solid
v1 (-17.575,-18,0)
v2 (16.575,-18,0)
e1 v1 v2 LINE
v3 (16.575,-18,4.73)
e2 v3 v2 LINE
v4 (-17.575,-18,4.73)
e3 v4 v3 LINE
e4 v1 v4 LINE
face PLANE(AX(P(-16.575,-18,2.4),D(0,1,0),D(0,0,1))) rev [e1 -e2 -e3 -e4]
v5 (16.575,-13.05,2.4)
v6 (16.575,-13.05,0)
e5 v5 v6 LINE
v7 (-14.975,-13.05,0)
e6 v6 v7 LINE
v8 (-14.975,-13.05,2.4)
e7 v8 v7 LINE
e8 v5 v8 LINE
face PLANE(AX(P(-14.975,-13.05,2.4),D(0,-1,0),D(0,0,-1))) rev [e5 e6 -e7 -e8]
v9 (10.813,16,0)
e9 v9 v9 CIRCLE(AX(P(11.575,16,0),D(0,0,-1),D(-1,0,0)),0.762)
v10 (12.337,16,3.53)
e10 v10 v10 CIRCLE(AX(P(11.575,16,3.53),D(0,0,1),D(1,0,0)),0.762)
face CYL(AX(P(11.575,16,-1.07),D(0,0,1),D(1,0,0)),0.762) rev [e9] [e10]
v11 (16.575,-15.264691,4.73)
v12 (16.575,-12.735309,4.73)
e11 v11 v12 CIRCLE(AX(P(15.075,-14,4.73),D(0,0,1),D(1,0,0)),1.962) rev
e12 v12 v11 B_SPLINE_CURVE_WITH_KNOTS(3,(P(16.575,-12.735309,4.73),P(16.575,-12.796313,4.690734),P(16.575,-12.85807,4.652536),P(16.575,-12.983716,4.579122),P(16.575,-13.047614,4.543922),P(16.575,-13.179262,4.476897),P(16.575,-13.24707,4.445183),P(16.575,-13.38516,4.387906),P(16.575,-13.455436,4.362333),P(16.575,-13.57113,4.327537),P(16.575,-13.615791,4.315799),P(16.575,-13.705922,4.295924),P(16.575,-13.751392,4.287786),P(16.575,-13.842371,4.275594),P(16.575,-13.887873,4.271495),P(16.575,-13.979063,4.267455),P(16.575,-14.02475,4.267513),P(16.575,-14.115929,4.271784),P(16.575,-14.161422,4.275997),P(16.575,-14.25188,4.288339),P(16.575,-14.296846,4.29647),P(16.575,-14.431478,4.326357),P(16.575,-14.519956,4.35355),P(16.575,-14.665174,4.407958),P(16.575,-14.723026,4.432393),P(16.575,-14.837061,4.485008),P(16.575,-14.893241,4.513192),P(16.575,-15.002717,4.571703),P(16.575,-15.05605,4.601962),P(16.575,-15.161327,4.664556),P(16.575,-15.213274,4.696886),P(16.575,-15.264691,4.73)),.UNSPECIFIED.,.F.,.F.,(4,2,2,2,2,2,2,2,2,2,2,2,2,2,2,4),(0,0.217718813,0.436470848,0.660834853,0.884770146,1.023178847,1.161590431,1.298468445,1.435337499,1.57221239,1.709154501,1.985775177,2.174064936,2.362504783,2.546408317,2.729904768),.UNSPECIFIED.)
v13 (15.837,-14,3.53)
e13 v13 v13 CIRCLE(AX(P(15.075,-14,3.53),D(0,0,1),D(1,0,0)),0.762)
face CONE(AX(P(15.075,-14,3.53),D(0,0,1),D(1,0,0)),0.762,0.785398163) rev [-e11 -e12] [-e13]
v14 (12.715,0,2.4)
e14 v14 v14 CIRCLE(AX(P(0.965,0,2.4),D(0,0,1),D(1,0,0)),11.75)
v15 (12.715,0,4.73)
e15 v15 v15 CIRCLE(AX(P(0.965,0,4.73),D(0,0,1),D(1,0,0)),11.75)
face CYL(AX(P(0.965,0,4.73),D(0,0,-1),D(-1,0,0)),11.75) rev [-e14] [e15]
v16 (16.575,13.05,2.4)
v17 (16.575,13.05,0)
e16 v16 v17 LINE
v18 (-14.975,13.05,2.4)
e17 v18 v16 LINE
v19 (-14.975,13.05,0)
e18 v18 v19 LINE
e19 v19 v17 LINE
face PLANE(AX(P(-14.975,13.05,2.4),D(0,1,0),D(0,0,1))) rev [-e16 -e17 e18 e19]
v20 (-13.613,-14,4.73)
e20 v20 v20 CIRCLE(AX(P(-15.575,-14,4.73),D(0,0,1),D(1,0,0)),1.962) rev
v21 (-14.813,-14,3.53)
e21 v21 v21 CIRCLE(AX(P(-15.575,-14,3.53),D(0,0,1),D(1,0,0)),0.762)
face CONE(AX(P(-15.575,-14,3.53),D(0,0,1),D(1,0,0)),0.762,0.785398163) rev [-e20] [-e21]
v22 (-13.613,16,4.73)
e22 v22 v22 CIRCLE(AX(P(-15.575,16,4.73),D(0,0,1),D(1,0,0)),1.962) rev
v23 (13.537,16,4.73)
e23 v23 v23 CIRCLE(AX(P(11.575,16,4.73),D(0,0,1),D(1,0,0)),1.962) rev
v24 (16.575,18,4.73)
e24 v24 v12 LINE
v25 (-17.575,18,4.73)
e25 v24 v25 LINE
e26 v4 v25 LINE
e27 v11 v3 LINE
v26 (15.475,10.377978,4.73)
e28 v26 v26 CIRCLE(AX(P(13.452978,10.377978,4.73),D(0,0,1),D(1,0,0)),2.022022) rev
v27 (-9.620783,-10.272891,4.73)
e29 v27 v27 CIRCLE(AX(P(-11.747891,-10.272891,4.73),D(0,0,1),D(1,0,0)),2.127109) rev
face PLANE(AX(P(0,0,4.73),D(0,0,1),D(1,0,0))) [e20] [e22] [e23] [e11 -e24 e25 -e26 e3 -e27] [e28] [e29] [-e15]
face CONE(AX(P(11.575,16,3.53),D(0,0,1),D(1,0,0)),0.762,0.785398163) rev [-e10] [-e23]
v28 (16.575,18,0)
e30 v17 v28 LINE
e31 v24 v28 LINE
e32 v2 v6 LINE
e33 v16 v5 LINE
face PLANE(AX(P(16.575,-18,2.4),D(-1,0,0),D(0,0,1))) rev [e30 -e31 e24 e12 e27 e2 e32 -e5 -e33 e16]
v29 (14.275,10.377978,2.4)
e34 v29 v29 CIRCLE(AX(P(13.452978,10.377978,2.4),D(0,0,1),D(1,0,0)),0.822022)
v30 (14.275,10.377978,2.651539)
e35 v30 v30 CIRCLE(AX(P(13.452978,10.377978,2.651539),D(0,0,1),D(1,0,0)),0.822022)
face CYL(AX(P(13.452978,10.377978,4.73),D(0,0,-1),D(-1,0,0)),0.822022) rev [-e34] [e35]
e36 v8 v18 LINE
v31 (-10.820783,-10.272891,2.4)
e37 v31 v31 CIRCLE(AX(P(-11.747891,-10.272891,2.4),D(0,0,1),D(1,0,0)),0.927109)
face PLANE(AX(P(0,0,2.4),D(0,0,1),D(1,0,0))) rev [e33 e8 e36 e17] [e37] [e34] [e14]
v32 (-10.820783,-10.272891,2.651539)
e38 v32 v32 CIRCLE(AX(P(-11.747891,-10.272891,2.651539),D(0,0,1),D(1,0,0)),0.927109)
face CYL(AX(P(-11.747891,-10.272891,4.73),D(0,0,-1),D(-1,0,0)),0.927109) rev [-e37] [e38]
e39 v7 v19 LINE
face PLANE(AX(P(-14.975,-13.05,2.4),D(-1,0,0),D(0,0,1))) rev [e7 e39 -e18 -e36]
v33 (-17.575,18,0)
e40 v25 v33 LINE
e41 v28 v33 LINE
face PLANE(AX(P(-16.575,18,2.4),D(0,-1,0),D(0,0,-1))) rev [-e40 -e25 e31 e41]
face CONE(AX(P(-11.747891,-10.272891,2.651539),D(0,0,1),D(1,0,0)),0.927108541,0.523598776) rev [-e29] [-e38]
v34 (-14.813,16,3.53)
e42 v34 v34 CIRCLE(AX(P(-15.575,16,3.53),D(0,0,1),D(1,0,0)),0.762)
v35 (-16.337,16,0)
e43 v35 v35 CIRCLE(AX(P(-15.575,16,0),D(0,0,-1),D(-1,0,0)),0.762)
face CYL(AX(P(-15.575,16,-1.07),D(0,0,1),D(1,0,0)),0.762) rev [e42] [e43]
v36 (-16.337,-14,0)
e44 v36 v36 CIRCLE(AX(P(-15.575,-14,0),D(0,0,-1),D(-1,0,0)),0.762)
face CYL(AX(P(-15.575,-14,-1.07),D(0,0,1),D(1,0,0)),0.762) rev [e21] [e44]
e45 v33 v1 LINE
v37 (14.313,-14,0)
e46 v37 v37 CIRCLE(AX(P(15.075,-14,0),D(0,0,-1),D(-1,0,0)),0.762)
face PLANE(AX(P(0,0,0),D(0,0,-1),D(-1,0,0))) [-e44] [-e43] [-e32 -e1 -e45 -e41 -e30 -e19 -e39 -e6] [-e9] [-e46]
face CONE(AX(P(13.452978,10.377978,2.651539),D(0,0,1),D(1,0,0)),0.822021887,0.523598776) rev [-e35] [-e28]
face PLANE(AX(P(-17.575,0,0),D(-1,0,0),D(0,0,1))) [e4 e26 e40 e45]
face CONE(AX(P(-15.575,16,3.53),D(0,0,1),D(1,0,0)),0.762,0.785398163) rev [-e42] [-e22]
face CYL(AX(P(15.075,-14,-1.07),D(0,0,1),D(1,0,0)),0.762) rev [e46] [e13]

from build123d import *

# Parameters (mm, degrees)
BOSS_EXTRUDE1_DEPTH = 2.4
SKETCH2_W           = 33.15
SKETCH2_H           = 36
SKETCH2_R           = 11.75
SKETCH2_R_2         = 0.822021887
SKETCH2_R_3         = 0.927108541
BOSS_EXTRUDE2_DEPTH = 2.33
CHAMFER1_SIZE       = 1.2
CHAMFER1_SIZE2      = 2.078460969
SKETCH3_R           = 0.762
CUT_EXTRUDE1_DEPTH  = 5.8
SKETCH4_W           = 4.73
SKETCH4_H           = 36
BOSS_EXTRUDE3_DEPTH = 1
CHAMFER2_SIZE       = 1.2


with BuildPart() as part:
    # Sketch1 → Boss-Extrude1 (new body)
    with BuildSketch(Plane.XY):
        Polygon((-16.575, -18), (16.575, -18), (16.575, -13.05), (-14.975, -13.05), (-14.975, 13.05), (16.575, 13.05), (16.575, 18), (-16.575, 18), align=None)
    extrude(amount=BOSS_EXTRUDE1_DEPTH)

    # Sketch2 → Boss-Extrude2 (add)
    with BuildSketch(Plane.XY.offset(2.4)):
        Rectangle(SKETCH2_W, SKETCH2_H)
        with Locations((0.965, 0)):
            Circle(SKETCH2_R, mode=Mode.SUBTRACT)
        with Locations((13.452978113, 10.377978113)):
            Circle(SKETCH2_R_2, mode=Mode.SUBTRACT)
        with Locations((-11.747891459, -10.272891459)):
            Circle(SKETCH2_R_3, mode=Mode.SUBTRACT)
    extrude(amount=BOSS_EXTRUDE2_DEPTH)

    # Chamfer1
    chamfer1_edges = [part.edges().sort_by_distance(p)[0] for p in [
        (12.630956227, 10.377978113, 4.73),
        (-12.675, -10.272891459, 4.73),
    ]]
    chamfer1_side = [part.faces().sort_by_distance(p)[0] for p in [
        (0, 17.510620546, 4.73),
    ]]
    chamfer(chamfer1_edges, length=CHAMFER1_SIZE, length2=CHAMFER1_SIZE2, reference=chamfer1_side[0])

    # Sketch3 → Cut-Extrude1 (cut)
    with BuildSketch(Plane.XY.offset(4.73)):
        with Locations((-15.575, 16)):
            Circle(SKETCH3_R)
        with Locations(Location((11.575, 16, 0), (0, 0, 180))):
            Circle(SKETCH3_R)
        with Locations((-15.575, -14)):
            Circle(SKETCH3_R)
        with Locations(Location((15.075, -14, 0), (0, 0, 180))):
            Circle(SKETCH3_R)
    extrude(amount=-CUT_EXTRUDE1_DEPTH, mode=Mode.SUBTRACT)

    # Sketch4 → Boss-Extrude3 (add)
    with BuildSketch(Plane.ZY.offset(16.575)):
        with Locations((2.365, 0)):
            Rectangle(SKETCH4_W, SKETCH4_H)
    extrude(amount=BOSS_EXTRUDE3_DEPTH)

    # Chamfer2
    # the kernel refuses this chamfer: 1.2 mm, written as the material it takes off along each edge
    with BuildSketch(Plane(origin=(15.075, -14, 4.73), x_dir=(-1, 0, 0), z_dir=(0, 1, 0))) as chamfer2_piece_1:
        Polygon((0.762 + CHAMFER2_SIZE, 0), (0.762, -CHAMFER2_SIZE), (0.762, 0), align=None)
    revolve(axis=Axis((15.075, -14, 4.73), (0, 0, 1)), mode=Mode.SUBTRACT)
    with BuildSketch(Plane(origin=(-15.575, -14, 4.73), x_dir=(1, 0, 0), z_dir=(0, -1, 0))) as chamfer2_piece_2:
        Polygon((0.762 + CHAMFER2_SIZE, 0), (0.762, -CHAMFER2_SIZE), (0.762, 0), align=None)
    revolve(axis=Axis((-15.575, -14, 4.73), (0, 0, 1)), mode=Mode.SUBTRACT)
    with BuildSketch(Plane(origin=(11.575, 16, 4.73), x_dir=(-1, 0, 0), z_dir=(0, 1, 0))) as chamfer2_piece_3:
        Polygon((0.762 + CHAMFER2_SIZE, 0), (0.762, -CHAMFER2_SIZE), (0.762, 0), align=None)
    revolve(axis=Axis((11.575, 16, 4.73), (0, 0, 1)), mode=Mode.SUBTRACT)
    with BuildSketch(Plane(origin=(-15.575, 16, 4.73), x_dir=(1, 0, 0), z_dir=(0, -1, 0))) as chamfer2_piece_4:
        Polygon((0.762 + CHAMFER2_SIZE, 0), (0.762, -CHAMFER2_SIZE), (0.762, 0), align=None)
    revolve(axis=Axis((-15.575, 16, 4.73), (0, 0, 1)), mode=Mode.SUBTRACT)


solid = part.part
